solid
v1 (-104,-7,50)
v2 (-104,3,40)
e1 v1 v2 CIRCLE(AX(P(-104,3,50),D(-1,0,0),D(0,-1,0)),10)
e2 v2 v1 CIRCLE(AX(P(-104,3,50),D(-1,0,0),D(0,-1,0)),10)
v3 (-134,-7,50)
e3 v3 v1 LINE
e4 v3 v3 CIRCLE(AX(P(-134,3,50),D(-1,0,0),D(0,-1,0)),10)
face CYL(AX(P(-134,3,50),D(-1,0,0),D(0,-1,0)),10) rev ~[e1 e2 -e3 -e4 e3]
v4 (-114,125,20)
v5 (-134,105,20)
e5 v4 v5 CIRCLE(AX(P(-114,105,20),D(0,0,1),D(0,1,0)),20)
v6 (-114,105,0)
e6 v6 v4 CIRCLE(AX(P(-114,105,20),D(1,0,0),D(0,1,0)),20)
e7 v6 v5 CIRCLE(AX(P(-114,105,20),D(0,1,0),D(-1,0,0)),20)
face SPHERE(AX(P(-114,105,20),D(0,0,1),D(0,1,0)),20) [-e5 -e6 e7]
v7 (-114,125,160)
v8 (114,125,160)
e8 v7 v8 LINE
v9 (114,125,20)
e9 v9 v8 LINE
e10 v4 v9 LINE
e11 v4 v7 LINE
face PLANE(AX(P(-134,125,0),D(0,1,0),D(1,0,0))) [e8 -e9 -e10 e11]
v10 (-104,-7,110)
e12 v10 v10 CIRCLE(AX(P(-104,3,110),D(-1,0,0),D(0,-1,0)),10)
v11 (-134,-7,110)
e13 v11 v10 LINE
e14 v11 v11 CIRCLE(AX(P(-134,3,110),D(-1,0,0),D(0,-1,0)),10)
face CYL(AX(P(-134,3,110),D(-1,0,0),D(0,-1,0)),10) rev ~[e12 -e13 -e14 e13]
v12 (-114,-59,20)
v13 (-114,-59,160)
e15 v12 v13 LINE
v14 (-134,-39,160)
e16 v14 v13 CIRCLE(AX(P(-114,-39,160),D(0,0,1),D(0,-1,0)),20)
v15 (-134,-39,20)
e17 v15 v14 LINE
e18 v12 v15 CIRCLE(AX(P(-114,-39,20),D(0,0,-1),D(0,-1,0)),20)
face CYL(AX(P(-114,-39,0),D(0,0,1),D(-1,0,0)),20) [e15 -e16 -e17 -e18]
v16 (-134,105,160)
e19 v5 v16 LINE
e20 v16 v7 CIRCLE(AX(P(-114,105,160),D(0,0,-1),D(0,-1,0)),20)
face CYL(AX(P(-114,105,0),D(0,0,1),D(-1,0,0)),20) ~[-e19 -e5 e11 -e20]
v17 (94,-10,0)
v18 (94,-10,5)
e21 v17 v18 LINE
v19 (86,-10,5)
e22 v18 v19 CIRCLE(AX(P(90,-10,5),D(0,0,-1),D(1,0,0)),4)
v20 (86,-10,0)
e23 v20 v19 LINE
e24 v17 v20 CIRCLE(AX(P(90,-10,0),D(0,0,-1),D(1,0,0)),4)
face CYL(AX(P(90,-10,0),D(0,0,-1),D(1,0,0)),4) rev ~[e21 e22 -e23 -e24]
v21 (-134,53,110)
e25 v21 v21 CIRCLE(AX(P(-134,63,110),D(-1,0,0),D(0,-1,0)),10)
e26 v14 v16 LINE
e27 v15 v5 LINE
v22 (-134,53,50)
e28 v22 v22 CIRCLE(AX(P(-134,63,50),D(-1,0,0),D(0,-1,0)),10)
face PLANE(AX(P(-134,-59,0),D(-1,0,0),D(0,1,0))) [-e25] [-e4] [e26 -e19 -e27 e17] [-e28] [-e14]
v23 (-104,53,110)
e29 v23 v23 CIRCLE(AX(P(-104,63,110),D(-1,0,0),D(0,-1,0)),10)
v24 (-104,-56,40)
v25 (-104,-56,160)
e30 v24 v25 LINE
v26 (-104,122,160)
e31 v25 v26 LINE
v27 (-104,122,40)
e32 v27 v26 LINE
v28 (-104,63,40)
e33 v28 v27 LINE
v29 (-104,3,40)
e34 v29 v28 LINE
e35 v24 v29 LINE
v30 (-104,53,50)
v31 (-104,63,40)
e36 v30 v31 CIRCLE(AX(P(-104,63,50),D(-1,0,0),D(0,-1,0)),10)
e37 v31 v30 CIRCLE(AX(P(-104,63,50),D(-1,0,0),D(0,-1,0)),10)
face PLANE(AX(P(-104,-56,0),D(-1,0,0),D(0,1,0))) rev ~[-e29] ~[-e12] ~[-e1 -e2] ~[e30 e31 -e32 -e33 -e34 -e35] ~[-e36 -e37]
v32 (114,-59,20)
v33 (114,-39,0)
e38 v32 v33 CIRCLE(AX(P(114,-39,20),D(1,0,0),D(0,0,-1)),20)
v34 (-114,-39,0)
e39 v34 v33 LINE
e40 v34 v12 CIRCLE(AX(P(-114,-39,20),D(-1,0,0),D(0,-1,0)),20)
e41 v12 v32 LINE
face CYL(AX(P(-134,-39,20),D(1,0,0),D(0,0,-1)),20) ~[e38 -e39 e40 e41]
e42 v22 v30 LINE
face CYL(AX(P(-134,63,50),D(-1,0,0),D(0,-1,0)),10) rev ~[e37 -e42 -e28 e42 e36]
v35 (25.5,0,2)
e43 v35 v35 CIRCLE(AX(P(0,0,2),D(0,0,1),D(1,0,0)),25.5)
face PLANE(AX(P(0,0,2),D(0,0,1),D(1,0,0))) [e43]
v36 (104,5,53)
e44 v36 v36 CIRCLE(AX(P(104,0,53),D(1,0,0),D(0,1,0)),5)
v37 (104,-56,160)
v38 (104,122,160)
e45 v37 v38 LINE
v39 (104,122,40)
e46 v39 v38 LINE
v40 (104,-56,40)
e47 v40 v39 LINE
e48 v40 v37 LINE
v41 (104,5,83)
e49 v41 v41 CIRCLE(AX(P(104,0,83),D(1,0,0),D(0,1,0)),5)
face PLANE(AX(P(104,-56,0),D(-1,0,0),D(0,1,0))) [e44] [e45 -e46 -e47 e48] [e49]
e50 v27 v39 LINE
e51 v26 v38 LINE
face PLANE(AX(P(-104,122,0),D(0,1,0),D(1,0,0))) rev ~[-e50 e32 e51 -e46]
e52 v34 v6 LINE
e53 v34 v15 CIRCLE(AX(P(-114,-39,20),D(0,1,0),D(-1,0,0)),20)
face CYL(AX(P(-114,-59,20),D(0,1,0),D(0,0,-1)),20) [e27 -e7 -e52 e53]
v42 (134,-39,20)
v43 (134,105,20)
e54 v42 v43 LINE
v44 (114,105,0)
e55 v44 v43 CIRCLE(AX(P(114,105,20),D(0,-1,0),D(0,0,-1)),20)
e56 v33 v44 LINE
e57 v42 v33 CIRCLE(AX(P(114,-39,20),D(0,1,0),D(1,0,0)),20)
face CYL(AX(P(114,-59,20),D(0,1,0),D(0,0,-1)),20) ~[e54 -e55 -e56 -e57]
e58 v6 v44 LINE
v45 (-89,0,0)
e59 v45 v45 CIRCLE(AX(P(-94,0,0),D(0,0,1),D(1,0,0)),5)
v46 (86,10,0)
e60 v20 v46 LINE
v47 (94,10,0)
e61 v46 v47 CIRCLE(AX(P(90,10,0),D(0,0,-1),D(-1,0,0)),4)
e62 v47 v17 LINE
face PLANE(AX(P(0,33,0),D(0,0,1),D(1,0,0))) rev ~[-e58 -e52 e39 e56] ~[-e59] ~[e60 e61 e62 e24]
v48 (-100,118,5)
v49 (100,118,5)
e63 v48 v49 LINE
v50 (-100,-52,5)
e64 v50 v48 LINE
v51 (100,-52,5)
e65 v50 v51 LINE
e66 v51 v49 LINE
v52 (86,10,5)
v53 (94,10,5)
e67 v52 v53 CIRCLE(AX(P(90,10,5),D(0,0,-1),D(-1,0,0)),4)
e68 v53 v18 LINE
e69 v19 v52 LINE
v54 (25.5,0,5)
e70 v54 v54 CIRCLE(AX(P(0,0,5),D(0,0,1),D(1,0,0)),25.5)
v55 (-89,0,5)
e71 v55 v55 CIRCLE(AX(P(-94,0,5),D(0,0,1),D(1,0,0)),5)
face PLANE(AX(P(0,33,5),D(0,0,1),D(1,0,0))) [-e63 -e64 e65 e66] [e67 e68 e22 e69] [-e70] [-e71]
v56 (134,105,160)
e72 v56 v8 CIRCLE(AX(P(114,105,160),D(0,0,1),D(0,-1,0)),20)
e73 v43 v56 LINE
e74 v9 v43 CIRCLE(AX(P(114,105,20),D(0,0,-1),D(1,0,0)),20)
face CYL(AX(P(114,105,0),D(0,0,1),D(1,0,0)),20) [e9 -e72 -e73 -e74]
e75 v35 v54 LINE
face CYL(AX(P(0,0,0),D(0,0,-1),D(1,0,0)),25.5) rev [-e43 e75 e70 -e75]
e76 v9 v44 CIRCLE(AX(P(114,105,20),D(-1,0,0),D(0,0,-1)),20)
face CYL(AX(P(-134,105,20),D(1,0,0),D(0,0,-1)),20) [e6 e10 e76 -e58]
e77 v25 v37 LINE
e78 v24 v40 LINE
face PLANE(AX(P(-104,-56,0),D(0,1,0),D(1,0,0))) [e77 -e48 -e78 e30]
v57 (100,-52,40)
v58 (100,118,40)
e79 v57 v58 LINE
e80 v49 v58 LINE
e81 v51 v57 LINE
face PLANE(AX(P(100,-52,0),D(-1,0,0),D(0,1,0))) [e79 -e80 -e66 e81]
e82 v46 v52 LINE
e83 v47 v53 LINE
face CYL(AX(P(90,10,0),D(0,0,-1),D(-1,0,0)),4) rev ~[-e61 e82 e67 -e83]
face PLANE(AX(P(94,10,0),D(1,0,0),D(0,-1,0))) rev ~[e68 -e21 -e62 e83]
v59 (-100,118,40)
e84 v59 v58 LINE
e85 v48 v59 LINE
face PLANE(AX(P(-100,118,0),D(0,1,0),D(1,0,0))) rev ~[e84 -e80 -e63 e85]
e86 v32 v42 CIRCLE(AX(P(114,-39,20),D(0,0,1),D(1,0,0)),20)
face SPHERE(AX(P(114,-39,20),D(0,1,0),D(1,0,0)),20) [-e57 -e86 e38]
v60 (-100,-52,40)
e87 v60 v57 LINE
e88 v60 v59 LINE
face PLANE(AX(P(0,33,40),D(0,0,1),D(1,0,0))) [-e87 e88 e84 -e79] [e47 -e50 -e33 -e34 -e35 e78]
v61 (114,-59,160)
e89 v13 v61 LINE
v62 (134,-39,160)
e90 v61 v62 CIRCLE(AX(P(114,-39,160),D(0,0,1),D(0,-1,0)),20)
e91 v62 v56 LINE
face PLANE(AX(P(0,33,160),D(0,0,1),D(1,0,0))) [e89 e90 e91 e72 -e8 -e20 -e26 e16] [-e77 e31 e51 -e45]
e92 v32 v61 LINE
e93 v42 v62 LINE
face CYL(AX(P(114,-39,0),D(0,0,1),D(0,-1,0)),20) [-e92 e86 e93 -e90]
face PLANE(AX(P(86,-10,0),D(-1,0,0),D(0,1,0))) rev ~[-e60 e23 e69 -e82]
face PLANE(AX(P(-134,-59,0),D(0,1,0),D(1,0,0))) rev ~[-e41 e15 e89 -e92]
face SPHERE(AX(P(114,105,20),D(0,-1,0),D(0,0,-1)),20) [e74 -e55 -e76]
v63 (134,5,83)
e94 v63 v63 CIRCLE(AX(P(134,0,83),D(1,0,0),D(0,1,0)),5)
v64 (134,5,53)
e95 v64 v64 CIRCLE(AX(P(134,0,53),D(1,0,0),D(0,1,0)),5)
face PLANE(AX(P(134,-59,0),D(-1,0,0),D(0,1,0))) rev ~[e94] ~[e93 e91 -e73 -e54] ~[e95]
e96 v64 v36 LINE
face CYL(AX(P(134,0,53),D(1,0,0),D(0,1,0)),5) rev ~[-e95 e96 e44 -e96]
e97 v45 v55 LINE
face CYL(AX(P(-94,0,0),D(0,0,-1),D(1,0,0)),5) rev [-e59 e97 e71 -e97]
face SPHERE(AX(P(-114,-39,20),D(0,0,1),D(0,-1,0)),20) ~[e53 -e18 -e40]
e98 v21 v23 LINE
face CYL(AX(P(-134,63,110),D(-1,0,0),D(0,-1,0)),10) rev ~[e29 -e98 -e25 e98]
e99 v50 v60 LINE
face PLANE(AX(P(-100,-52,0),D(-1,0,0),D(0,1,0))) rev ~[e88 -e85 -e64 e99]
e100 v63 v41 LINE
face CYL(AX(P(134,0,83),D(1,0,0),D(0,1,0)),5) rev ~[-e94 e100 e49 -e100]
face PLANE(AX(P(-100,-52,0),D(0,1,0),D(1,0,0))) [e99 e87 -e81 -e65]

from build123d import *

# Parameters (mm, degrees)
F0_R      = 25.5
F1_DEPTH  = 2
F0_W      = 200
F0_H      = 170
F0_R_2    = 5
F2_DEPTH  = 5
F0_W_2    = 268
F0_H_2    = 184
F0_W_3    = 208
F0_H_3    = 178
F3_DEPTH  = 160
F4_DEPTH  = 40
F5_R      = 5
F6_DEPTH  = 30.3
F7_DEPTH  = 30
F8_DEPTH  = 10
F9_R      = 10
F10_DEPTH = 30
F11_R     = 20


# Not quite as in the source:
# - a feature names something its author has since deleted; it is built from what else it names


with BuildPart() as f1:
    # F0 (on Top) → F1 (new body)
    with BuildSketch(Plane.XY):
        Circle(F0_R)
    extrude(amount=F1_DEPTH)

    # F0 (on Top) → F2 (join)
    with BuildSketch(Plane.XY):
        with Locations((0, 33)):
            Rectangle(F0_W, F0_H)
        with Locations((-94, 0)):
            Circle(F0_R_2, mode=Mode.SUBTRACT)
        Circle(F0_R, mode=Mode.SUBTRACT)
        with BuildLine():
            Line((94, 10), (94, 0))
            Line((94, 0), (94, -10))
            ThreePointArc((94, -10), (90, -14), (86, -10))
            Line((86, -10), (86, 10))
            ThreePointArc((86, 10), (90, 14), (94, 10))
        make_face(mode=Mode.SUBTRACT)
    extrude(amount=F2_DEPTH)



with BuildPart() as f3:
    # F0 (on Top) → F3 (new body)
    with BuildSketch(Plane.XY):
        with Locations((0, 33)):
            Rectangle(F0_W_2, F0_H_2)
        with Locations((0, 33)):
            Rectangle(F0_W_3, F0_H_3, mode=Mode.SUBTRACT)
    extrude(amount=F3_DEPTH)


with BuildPart() as f1_1:
    add(f1.part)

    add(f3.part)  # F4 merges F3
    # F0 (on Top) → F4 (join)
    with BuildSketch(Plane.XY):
        with Locations((0, 33)):
            Rectangle(F0_W_3, F0_H_3)
        with Locations((0, 33)):
            Rectangle(F0_W, F0_H, mode=Mode.SUBTRACT)
    extrude(amount=F4_DEPTH)

    # F5 (on face) → F6 (cut)
    with BuildSketch(Plane.YZ.offset(134)):
        with Locations((0, 83)):
            Circle(F5_R)
    extrude(amount=-F6_DEPTH, mode=Mode.SUBTRACT)

    # F5 (on face) → F7 (cut)
    with BuildSketch(Plane.YZ.offset(134)):
        with Locations((0, 53)):
            Circle(F5_R)
    extrude(amount=-F7_DEPTH, mode=Mode.SUBTRACT)

    # F0 (on Top) → F8 (cut)
    with BuildSketch(Plane.XY):
        with BuildLine():
            Line((94, -10), (94, 0))
            Line((94, 0), (94, 10))
            ThreePointArc((94, 10), (90, 14), (86, 10))
            Line((86, 10), (86, -10))
            ThreePointArc((86, -10), (90, -14), (94, -10))
        make_face()
    extrude(amount=F8_DEPTH, mode=Mode.SUBTRACT)

    # F9 (on face) → F10 (cut, through all)
    with BuildSketch(Plane(origin=(-134, 0, 0), x_dir=(0, -1, 0), z_dir=(-1, 0, 0))):
        with Locations((-63, 110)):
            Circle(F9_R)
        with Locations((-3, 110)):
            Circle(F9_R)
        with Locations((-63, 50)):
            Circle(F9_R)
        with Locations((-3, 50)):
            Circle(F9_R)
    extrude(amount=-F10_DEPTH, mode=Mode.SUBTRACT)

    # F11
    f11_edges = [f1_1.edges().sort_by_distance(p)[0] for p in [
        (-134, -59, 80),
        (-134, 125, 80),
        (134, 33, 0),
        (134, -59, 80),
        (0, -59, 0),
        (0, 125, 0),
        (-134, 33, 0),
        (134, 125, 80),
    ]]
    fillet(f11_edges, radius=F11_R)


solid = f1_1.part
